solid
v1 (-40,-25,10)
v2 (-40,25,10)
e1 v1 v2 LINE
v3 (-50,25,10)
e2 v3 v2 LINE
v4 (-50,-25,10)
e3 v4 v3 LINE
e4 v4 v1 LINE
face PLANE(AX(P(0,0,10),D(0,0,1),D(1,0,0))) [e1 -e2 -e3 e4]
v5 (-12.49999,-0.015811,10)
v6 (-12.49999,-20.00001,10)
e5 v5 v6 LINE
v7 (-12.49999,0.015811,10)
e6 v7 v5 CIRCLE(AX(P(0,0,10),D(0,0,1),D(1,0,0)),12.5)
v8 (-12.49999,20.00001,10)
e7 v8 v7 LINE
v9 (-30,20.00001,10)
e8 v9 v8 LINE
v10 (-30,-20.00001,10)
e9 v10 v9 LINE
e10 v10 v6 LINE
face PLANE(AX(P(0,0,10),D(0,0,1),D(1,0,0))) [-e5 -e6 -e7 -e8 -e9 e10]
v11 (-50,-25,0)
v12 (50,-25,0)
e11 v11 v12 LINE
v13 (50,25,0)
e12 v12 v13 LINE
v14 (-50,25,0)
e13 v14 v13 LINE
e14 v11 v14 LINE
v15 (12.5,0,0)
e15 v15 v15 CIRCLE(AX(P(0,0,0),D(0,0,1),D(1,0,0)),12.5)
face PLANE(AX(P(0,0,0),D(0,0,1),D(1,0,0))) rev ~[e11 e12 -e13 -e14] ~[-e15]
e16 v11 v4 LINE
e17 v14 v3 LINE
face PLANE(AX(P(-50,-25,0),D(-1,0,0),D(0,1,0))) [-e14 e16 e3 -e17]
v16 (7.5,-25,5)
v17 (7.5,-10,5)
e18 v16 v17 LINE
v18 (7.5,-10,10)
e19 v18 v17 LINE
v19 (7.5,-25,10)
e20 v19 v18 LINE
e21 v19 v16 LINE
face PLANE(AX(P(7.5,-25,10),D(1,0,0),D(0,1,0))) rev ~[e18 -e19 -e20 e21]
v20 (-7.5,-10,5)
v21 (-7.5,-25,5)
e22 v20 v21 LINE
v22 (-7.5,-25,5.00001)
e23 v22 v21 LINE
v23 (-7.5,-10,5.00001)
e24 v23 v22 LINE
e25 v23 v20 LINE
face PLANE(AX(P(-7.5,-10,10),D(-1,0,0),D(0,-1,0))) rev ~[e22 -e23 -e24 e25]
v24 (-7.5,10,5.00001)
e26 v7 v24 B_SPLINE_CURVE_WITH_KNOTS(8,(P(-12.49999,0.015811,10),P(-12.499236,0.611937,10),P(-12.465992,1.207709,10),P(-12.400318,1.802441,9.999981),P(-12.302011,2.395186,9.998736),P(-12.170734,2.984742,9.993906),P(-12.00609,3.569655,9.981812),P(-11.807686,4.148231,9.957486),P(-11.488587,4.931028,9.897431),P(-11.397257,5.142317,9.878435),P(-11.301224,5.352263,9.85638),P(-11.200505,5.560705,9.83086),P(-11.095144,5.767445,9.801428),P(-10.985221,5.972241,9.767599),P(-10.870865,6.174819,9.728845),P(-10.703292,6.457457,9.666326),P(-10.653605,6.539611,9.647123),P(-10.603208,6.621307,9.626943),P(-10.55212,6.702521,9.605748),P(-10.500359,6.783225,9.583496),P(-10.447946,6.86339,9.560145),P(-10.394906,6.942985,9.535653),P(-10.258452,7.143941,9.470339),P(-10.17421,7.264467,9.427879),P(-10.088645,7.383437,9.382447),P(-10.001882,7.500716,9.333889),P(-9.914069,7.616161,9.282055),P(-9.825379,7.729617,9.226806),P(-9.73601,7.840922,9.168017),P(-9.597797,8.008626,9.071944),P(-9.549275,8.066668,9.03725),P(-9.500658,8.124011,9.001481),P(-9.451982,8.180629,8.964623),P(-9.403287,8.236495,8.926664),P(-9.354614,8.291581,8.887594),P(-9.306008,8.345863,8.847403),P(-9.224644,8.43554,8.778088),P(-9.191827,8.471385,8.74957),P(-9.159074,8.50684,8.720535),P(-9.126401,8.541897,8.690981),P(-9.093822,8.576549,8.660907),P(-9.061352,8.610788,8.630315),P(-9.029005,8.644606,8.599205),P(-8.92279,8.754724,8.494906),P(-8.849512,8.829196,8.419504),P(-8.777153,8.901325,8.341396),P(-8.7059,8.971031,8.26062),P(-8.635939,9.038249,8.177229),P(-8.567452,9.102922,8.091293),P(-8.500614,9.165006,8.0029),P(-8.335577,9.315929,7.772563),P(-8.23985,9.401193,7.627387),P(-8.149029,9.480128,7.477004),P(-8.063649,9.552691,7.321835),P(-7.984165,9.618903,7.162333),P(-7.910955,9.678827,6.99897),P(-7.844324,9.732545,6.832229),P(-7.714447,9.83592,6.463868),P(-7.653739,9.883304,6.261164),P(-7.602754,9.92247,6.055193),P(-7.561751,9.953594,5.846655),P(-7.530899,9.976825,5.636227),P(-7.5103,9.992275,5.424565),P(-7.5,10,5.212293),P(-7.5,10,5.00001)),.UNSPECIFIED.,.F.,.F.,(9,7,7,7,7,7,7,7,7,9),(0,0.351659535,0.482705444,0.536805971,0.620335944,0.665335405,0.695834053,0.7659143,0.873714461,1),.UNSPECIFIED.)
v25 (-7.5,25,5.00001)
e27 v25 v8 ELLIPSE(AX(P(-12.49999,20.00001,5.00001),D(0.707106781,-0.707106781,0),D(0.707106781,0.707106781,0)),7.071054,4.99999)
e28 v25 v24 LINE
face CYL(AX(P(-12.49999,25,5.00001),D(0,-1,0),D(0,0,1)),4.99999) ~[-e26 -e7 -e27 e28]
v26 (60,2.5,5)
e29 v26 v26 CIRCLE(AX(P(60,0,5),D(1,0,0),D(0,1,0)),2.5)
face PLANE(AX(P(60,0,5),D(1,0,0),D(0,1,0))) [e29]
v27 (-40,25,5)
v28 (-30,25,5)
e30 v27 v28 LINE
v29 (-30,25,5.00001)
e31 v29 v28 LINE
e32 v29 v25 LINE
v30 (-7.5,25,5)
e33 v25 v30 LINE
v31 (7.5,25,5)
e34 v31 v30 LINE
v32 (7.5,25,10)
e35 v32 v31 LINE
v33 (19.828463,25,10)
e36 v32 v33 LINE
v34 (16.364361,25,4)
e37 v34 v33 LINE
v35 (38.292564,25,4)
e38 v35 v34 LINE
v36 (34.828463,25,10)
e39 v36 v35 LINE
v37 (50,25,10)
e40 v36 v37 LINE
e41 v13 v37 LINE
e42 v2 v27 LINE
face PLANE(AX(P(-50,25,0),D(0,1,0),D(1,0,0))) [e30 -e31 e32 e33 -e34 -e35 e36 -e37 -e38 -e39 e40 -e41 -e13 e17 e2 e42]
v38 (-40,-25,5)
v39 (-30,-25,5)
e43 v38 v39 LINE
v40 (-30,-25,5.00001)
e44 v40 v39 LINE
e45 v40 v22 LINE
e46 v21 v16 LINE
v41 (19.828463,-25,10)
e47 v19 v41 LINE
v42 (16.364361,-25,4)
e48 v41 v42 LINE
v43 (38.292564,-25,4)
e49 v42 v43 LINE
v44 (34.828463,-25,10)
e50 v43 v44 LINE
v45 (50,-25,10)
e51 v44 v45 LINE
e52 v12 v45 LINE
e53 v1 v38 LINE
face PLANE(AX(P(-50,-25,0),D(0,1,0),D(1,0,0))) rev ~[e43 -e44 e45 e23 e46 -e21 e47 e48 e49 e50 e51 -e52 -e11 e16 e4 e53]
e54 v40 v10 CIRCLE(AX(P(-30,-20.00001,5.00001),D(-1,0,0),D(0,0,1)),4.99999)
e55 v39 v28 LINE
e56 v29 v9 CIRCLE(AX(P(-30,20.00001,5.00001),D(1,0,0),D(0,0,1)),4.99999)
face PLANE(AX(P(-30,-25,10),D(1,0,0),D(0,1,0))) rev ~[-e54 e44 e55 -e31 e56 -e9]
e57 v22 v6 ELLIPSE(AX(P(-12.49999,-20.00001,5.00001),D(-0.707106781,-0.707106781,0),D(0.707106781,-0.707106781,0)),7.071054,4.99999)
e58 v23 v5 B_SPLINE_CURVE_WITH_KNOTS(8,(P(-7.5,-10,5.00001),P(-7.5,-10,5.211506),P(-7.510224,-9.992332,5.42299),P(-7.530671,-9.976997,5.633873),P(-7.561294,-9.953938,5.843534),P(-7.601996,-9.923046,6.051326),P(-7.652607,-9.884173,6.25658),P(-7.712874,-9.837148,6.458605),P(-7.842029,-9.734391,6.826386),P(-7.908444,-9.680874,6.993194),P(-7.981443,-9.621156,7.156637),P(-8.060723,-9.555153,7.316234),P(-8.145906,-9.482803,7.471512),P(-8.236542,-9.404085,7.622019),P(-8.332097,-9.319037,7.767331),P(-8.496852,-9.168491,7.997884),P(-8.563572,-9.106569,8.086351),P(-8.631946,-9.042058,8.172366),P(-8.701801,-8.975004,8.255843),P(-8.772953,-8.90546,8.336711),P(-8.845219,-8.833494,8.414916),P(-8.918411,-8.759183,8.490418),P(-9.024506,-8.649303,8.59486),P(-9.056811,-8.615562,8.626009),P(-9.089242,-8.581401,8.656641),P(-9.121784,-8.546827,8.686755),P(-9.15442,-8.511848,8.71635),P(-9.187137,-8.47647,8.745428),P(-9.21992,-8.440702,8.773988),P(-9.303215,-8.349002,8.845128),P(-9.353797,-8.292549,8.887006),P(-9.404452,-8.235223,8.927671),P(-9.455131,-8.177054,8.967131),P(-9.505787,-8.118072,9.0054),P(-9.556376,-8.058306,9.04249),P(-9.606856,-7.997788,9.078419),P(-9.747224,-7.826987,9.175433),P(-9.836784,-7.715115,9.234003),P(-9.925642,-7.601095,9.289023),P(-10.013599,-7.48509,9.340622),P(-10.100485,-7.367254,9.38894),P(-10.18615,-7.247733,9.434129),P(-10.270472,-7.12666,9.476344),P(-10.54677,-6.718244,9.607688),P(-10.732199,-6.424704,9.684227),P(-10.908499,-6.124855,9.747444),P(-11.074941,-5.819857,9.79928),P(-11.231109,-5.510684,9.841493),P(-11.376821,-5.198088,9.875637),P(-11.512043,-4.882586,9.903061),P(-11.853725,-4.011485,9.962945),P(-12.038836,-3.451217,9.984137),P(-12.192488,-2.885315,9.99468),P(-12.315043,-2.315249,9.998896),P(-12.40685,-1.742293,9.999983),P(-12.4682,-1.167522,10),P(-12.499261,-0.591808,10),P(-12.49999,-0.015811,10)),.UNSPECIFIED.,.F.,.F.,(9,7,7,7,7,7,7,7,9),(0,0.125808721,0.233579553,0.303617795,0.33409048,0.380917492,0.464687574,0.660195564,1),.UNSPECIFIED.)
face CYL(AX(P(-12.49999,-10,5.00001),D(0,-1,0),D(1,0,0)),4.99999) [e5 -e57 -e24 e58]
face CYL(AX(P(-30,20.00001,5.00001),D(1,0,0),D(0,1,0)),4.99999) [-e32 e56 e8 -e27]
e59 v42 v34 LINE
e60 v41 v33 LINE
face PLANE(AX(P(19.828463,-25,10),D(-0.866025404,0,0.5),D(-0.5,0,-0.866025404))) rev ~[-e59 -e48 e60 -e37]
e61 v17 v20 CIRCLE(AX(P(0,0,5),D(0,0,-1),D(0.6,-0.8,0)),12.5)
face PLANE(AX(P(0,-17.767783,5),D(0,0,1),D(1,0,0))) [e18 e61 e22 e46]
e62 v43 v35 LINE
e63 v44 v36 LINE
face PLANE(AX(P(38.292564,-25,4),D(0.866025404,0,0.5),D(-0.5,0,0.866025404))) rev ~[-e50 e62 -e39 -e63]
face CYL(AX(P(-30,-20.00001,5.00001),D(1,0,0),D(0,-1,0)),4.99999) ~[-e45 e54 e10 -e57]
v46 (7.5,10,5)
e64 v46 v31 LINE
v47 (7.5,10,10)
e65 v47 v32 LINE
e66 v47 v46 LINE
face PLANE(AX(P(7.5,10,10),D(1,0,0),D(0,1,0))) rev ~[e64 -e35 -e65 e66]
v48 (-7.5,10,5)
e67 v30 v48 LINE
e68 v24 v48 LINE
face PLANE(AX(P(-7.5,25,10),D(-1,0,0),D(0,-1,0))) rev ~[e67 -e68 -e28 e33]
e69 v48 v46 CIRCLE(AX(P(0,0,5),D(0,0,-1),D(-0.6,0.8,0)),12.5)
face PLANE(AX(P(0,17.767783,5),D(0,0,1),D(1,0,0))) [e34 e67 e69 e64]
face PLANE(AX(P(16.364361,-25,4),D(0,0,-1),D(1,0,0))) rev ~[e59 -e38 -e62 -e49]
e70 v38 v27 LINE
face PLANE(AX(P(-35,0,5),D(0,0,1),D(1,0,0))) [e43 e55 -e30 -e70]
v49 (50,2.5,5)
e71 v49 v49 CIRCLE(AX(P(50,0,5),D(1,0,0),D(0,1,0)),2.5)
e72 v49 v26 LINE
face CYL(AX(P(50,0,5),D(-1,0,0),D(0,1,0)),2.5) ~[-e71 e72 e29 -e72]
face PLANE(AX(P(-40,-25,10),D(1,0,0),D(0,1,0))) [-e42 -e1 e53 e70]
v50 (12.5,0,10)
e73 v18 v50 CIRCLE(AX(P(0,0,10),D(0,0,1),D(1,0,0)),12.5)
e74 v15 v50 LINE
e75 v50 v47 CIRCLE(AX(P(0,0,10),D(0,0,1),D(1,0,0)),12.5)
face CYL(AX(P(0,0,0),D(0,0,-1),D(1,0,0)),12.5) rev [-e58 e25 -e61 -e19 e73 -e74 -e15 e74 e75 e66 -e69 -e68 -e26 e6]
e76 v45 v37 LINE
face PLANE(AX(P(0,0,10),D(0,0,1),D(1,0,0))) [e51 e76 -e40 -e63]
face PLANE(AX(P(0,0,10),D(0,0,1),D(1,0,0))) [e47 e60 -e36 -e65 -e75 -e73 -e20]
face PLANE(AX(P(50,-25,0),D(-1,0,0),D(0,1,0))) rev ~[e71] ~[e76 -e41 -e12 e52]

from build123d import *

# Parameters (mm, degrees)
F0_W     = 100
F0_H     = 50
F0_R     = 12.5
F1_DEPTH = 10
F2_W     = 10
F2_H     = 50
F3_DEPTH = 5
F5_DEPTH = 50.001
F6_R     = 2.5
F7_DEPTH = 10
F8_R     = 4.99999


# Not quite as in the source:
# - a fillet or chamfer is up to 0.001 mm smaller than in the source, because OpenCascade refuses the exact size


with BuildPart() as f1:
    # F0 (on Top) → F1 (new body)
    with BuildSketch(Plane.XY):
        Rectangle(F0_W, F0_H)
        Circle(F0_R, mode=Mode.SUBTRACT)
    extrude(amount=F1_DEPTH)

    # F2 (on face) → F3 (cut)
    with BuildSketch(Plane.XY.offset(10)):
        with Locations((-35, 0)):
            Rectangle(F2_W, F2_H)
        with BuildLine():
            Line((-7.5, -10), (-7.5, -25))
            Line((-7.5, -25), (7.5, -25))
            Line((7.5, -25), (7.5, -10))
            ThreePointArc((7.5, -10), (0, -12.5), (-7.5, -10))
        make_face()
        with BuildLine():
            Line((7.5, 25), (-7.5, 25))
            Line((-7.5, 25), (-7.5, 10))
            ThreePointArc((-7.5, 10), (0, 12.5), (7.5, 10))
            Line((7.5, 10), (7.5, 25))
        make_face()
    extrude(amount=-F3_DEPTH, mode=Mode.SUBTRACT)

    # F4 (on face) → F5 (cut, through all)
    with BuildSketch(Plane.XZ.offset(25)):
        Polygon((34.8284628647, 10), (19.8284628647, 10), (16.3643612496, 4), (38.2925644799, 4), align=None)
    extrude(amount=-F5_DEPTH, mode=Mode.SUBTRACT)

    # F6 (on face) → F7 (join)
    with BuildSketch(Plane.YZ.offset(50)):
        with Locations((0, 5)):
            Circle(F6_R)
    extrude(amount=F7_DEPTH)

    # F8 (radius 5 in the source; OpenCascade refuses exactly that, so slightly less here)
    f8_edges = [f1.edges().sort_by_distance(p)[0] for p in [
        (-18.75, -25, 10),
        (-18.75, 25, 10),
        (-7.5, -17.5, 10),
        (-7.5, 17.5, 10),
    ]]
    fillet(f8_edges, radius=F8_R)


solid = f1.part
